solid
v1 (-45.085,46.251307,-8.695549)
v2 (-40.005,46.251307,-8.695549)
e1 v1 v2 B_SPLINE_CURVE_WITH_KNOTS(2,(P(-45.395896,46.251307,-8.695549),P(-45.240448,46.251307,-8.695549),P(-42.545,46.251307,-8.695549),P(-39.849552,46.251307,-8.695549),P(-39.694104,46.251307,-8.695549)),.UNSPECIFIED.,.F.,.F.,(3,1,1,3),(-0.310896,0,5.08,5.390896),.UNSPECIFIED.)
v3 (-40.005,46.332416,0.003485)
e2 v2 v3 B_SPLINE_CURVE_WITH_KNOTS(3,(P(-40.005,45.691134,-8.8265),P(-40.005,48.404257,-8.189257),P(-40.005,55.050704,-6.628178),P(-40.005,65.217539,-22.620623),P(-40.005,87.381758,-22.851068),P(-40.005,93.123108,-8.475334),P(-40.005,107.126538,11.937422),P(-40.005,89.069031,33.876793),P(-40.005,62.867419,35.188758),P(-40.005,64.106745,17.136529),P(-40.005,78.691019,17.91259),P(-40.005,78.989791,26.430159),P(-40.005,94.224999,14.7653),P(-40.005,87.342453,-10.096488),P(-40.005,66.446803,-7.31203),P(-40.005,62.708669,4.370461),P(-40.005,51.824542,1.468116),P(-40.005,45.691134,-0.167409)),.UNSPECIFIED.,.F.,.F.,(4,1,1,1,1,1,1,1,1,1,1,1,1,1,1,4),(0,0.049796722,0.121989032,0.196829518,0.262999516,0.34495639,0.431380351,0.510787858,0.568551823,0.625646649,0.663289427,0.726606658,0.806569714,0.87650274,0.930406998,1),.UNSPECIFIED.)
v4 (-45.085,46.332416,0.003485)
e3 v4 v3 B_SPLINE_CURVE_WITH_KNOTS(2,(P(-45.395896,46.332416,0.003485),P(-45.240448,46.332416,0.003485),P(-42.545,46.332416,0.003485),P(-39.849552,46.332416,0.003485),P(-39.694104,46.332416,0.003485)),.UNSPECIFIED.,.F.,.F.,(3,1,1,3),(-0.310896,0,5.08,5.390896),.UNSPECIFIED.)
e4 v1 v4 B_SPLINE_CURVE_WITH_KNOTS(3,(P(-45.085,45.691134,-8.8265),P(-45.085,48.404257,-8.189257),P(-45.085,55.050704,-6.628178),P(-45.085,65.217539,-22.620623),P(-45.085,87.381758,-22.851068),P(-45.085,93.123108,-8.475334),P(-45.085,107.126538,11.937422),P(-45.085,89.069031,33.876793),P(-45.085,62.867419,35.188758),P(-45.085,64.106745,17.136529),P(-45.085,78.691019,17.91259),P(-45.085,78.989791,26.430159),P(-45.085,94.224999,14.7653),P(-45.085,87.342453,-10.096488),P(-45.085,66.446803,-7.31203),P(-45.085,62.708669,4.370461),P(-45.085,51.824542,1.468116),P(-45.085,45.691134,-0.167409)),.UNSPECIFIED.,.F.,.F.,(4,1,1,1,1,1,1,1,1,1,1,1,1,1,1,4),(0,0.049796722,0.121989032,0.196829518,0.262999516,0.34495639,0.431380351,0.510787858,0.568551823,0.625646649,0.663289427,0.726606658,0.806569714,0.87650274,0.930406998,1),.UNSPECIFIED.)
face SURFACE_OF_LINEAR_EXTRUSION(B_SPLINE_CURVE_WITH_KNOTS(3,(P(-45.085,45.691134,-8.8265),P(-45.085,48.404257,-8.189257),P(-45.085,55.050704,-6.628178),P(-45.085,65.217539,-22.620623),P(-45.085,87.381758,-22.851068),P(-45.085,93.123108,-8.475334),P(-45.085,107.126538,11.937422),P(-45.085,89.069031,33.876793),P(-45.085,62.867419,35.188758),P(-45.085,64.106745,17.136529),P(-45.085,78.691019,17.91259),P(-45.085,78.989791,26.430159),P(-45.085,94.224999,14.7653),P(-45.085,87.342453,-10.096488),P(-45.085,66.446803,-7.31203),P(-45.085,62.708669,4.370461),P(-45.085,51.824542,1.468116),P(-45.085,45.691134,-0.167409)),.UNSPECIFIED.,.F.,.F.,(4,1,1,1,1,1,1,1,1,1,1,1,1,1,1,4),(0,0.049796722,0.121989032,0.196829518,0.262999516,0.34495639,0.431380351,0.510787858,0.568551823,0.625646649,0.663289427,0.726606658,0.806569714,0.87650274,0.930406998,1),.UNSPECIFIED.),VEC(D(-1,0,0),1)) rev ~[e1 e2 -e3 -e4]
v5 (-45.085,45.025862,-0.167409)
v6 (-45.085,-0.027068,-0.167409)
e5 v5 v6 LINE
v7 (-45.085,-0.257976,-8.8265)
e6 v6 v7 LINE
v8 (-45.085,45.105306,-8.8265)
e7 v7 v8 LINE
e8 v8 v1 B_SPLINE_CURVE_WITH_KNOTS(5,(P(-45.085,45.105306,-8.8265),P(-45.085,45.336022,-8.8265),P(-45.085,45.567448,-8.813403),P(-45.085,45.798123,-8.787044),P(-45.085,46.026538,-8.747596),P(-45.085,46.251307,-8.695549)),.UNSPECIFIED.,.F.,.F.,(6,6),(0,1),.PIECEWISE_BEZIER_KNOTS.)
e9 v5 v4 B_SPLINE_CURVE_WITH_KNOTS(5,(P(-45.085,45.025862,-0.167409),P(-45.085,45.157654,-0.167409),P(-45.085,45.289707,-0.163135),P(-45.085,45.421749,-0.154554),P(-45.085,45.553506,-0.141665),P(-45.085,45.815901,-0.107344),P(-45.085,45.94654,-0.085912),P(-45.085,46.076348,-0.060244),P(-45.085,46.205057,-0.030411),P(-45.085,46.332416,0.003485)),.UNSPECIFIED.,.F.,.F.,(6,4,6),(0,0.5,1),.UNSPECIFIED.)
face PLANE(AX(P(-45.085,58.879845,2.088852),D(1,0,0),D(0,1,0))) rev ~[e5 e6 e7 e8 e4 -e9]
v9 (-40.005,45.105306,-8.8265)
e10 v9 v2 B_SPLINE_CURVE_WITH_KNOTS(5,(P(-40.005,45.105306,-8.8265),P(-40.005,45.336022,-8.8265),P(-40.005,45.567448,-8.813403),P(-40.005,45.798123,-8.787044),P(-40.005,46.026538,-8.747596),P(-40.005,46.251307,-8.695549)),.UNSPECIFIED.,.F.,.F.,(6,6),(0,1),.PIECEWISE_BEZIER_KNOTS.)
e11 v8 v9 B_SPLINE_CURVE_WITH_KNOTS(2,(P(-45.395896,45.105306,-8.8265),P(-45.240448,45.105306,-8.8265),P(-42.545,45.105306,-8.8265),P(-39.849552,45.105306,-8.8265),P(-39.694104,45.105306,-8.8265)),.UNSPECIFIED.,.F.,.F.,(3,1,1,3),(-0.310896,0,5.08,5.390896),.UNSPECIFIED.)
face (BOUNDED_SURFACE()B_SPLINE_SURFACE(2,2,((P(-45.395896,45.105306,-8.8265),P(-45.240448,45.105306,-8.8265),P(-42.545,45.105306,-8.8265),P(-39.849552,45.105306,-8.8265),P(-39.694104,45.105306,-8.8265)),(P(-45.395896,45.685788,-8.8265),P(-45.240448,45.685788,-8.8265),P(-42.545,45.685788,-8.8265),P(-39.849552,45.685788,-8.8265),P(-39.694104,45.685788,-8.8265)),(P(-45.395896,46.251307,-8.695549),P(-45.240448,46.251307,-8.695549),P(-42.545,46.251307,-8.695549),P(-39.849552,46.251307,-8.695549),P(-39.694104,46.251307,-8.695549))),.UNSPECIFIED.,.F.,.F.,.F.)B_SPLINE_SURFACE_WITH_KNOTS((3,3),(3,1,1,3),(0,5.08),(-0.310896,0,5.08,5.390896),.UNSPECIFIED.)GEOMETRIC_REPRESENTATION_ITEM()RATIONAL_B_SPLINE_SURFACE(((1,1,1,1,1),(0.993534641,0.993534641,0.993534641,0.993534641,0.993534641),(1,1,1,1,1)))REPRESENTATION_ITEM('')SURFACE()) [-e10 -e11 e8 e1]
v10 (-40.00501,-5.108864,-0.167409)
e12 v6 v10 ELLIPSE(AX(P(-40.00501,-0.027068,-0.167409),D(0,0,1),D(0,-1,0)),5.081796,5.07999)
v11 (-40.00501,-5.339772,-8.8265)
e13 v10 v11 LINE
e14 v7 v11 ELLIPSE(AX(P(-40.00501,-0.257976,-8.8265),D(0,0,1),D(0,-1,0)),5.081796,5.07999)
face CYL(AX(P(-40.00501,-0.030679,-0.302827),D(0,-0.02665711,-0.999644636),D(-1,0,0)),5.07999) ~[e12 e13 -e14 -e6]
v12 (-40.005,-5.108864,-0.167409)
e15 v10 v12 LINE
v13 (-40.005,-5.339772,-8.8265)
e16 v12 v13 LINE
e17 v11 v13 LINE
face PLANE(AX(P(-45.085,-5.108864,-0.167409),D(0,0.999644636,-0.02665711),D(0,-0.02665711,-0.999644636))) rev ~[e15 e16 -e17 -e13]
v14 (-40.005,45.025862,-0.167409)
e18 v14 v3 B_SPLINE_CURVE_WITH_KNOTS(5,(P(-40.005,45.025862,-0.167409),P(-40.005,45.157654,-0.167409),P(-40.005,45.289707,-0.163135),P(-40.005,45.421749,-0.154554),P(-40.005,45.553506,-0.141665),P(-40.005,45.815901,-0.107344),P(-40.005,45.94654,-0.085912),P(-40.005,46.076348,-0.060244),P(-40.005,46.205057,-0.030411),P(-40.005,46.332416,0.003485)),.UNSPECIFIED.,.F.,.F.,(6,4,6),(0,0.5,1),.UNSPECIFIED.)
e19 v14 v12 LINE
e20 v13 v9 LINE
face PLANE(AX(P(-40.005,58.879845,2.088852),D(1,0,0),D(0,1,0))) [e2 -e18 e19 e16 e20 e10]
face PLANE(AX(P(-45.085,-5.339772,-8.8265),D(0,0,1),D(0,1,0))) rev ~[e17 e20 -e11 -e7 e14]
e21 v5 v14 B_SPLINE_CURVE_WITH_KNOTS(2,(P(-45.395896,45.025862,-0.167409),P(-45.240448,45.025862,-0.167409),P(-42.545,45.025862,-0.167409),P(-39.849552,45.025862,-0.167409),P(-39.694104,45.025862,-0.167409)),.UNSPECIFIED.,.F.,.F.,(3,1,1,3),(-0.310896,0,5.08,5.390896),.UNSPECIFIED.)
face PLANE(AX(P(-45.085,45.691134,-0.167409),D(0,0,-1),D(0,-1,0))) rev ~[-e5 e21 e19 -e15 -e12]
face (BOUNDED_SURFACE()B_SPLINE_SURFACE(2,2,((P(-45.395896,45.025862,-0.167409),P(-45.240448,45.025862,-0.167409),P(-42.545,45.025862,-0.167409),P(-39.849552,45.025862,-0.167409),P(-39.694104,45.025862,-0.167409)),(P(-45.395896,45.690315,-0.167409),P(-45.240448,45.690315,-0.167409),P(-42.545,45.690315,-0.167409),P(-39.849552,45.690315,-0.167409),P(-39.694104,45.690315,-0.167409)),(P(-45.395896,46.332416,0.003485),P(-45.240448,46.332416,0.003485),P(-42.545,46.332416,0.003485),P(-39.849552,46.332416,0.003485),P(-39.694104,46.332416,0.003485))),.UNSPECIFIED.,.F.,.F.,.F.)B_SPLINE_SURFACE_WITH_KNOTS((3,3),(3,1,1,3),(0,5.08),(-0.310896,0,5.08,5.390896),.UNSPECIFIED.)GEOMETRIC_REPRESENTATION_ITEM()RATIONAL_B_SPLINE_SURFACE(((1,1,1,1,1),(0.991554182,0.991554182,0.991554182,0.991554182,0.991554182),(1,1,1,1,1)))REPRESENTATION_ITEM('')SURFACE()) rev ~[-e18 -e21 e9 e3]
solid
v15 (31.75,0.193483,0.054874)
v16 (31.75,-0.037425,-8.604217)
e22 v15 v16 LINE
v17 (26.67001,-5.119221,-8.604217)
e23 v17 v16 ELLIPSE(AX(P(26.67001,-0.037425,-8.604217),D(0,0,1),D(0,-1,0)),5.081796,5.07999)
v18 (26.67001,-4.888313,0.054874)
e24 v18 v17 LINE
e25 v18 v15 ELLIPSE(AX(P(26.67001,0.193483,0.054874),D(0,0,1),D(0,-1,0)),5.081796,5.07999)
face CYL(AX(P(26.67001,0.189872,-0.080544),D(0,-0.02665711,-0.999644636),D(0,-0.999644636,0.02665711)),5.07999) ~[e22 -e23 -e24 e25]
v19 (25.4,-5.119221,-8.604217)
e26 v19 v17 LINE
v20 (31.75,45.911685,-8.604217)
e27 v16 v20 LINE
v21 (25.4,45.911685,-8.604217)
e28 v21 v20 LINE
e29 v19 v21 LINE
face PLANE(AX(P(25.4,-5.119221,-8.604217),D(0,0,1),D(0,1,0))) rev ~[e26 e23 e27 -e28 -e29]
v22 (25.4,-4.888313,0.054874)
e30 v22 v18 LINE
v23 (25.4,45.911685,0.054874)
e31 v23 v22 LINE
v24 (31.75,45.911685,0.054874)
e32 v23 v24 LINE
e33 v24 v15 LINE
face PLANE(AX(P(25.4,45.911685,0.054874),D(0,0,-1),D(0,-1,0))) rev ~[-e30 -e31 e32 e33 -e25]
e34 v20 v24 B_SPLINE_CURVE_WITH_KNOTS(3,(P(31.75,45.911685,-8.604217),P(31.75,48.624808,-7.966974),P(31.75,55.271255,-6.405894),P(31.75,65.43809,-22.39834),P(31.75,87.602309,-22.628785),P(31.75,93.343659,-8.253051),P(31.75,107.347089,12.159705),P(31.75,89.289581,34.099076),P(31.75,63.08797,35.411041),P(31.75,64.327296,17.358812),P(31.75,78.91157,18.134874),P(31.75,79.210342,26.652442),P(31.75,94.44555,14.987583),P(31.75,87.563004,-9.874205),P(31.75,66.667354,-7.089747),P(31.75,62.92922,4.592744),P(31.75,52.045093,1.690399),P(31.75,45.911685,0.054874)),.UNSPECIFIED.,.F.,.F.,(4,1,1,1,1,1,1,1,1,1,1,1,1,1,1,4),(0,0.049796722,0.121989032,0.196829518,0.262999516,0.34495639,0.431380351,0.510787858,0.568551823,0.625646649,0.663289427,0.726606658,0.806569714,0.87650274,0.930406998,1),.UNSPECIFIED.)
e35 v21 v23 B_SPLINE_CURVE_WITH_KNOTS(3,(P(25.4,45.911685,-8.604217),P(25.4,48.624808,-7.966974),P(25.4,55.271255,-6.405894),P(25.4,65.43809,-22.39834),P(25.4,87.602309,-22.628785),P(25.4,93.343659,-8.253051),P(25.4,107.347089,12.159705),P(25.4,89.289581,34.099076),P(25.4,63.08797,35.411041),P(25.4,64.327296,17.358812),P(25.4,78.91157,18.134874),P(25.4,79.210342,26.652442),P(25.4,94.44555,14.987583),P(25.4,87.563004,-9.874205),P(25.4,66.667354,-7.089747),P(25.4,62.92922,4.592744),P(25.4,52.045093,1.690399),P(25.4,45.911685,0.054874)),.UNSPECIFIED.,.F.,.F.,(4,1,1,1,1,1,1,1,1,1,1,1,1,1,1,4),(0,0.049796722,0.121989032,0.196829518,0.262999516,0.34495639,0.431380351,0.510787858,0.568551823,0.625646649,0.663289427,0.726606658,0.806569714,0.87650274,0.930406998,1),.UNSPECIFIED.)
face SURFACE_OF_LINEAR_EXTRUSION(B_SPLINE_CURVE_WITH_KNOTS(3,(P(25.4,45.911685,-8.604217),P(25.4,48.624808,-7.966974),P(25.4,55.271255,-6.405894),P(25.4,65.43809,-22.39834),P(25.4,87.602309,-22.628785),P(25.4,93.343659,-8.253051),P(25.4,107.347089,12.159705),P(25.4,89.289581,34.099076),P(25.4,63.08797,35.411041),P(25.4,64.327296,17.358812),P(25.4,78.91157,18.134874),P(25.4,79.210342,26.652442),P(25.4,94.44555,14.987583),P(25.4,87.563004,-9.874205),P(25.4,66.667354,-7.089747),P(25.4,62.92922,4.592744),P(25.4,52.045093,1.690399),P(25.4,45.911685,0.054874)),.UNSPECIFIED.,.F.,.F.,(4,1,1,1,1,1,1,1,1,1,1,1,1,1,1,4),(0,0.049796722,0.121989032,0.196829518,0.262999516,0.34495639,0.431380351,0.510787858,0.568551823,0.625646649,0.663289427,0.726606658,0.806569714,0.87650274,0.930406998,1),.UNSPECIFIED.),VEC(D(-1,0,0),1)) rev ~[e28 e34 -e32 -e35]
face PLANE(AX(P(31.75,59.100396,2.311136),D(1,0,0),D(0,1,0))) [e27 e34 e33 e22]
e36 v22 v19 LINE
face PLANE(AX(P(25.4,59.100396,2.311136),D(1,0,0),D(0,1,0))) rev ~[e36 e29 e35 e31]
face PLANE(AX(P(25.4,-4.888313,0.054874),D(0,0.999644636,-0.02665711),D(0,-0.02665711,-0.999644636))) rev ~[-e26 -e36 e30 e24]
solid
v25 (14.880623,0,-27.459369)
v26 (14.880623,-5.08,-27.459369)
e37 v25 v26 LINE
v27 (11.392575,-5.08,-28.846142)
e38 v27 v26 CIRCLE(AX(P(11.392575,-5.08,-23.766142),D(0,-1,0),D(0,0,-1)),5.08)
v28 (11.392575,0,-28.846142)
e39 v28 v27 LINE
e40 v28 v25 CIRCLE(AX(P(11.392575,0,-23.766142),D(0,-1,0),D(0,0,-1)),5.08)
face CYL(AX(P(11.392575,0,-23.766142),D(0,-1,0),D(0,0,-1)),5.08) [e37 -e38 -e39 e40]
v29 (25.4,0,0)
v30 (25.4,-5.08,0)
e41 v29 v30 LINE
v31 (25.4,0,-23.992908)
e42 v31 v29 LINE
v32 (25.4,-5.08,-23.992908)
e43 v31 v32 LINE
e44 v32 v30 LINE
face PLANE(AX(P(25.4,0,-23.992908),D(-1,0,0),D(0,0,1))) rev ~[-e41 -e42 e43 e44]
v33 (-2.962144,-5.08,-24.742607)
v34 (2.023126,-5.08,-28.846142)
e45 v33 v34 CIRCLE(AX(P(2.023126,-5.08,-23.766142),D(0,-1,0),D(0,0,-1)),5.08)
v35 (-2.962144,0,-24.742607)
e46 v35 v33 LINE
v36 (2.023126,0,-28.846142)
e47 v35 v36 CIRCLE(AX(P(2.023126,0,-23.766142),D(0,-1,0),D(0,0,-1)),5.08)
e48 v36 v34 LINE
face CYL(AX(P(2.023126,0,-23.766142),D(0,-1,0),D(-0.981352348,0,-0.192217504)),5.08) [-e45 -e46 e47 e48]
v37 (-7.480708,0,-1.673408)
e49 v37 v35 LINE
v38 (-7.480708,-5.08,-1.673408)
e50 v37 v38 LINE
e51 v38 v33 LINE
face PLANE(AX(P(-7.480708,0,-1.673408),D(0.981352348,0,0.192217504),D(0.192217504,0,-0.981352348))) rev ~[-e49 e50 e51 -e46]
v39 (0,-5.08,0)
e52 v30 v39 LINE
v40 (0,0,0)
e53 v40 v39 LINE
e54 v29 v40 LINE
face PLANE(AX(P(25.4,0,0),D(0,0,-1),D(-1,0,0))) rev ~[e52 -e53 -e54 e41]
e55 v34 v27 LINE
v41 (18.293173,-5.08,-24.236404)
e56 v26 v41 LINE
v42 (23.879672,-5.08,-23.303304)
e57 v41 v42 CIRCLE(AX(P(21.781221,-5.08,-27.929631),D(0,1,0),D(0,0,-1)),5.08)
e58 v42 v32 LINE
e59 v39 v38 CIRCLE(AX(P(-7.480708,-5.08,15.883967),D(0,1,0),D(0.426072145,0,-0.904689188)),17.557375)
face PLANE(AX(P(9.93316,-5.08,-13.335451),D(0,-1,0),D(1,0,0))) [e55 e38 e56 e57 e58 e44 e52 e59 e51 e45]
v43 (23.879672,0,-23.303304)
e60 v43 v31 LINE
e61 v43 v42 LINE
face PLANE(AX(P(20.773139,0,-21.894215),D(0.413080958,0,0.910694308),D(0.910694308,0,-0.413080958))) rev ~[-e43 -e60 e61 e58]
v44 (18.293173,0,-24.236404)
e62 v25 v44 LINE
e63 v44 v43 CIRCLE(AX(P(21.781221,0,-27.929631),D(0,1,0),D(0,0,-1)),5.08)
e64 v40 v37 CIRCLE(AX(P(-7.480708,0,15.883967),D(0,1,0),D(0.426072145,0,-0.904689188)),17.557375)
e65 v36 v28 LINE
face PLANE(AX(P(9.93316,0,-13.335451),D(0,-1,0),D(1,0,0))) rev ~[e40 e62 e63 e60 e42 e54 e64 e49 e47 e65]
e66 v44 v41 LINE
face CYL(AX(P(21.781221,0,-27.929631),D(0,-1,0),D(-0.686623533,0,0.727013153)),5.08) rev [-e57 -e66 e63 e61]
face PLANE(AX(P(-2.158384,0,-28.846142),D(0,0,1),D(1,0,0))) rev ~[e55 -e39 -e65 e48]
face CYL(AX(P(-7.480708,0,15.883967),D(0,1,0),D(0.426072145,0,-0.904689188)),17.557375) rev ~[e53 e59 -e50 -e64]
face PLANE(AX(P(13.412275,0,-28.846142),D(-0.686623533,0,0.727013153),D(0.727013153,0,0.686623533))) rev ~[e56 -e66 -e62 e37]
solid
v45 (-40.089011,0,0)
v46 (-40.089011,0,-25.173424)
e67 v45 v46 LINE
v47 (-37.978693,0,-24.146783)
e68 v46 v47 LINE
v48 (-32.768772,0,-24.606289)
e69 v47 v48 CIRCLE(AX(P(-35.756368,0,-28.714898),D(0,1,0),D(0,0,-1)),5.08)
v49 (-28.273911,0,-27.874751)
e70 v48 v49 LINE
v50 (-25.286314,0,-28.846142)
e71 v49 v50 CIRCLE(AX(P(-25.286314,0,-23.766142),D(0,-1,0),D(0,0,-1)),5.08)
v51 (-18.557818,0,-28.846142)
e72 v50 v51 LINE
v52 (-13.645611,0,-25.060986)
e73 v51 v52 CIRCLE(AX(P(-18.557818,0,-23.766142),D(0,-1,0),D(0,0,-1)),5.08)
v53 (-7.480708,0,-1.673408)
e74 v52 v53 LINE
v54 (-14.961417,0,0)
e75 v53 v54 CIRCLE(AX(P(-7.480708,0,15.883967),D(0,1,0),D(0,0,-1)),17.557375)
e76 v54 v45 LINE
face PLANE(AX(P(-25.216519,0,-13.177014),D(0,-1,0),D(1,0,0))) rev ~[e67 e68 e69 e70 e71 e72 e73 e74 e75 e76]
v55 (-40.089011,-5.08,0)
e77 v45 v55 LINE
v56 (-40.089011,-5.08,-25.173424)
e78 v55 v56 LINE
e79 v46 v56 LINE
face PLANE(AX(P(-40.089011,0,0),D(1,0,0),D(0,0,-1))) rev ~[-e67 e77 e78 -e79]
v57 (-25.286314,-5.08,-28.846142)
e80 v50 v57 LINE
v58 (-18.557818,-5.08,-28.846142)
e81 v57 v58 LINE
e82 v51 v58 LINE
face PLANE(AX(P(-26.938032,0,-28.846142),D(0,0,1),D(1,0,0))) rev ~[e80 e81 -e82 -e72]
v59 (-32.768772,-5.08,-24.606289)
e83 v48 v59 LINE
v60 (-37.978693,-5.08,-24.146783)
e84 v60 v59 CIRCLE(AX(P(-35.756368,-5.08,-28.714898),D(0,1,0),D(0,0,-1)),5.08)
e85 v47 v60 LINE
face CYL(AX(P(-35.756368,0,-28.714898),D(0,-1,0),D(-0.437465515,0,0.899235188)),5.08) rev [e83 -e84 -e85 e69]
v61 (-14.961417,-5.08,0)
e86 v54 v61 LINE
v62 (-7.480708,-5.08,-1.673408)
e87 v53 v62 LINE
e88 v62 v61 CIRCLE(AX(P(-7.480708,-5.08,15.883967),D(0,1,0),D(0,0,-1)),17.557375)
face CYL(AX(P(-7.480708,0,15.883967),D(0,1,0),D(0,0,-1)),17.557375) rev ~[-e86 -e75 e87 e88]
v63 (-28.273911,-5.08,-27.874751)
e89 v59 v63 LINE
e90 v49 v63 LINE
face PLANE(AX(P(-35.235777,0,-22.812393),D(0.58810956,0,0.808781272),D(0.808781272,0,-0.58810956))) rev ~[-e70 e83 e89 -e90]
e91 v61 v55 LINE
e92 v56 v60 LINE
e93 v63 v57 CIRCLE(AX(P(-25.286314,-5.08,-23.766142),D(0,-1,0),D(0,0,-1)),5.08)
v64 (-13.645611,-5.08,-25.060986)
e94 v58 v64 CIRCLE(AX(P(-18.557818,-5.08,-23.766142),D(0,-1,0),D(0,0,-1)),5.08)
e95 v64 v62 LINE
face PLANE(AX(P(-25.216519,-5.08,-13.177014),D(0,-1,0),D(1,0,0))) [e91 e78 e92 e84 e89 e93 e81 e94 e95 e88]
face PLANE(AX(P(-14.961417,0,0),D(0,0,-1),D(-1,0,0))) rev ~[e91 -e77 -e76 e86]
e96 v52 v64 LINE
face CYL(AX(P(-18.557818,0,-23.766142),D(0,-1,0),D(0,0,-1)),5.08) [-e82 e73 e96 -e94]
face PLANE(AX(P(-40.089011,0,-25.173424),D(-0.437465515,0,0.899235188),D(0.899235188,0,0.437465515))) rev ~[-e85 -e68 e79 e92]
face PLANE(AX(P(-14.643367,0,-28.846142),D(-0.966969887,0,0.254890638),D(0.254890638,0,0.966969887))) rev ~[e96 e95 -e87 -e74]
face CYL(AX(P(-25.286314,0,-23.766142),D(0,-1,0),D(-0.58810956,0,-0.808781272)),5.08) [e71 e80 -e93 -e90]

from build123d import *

# Parameters (mm, degrees)
F1_DEPTH  = 5.08
F2_R      = 5.08
F5_DEPTH  = 5.08
F6_R      = 5.08
F7_DEPTH  = 5.08
F8_R      = 5.08
F10_DEPTH = 6.35
F13_R     = 5.07999
F13_2_R   = 5.07999


# Not quite as in the source:
# - a fillet or chamfer is up to 0.001 mm smaller than in the source, because OpenCascade refuses the exact size


with BuildPart() as f1:
    # F0 (on Right) → F1 (new body)
    with BuildSketch(Plane.YZ):
        with BuildLine():
            Line((18.7036339194, 8.6590908468), (-32.0963636041, 8.6590908468))
            Line((-32.0963636041, 8.6590908468), (-32.3272719979, 0))
            Line((-32.3272719979, 0), (18.7036339194, 0))
            add(Edge.make_bspline(
                [(18.7036339194, 0), (21.4167571987, 0.6372428688), (28.063204378, 2.1983223451), (38.2300388432, -13.794123064), (60.394257954, -14.0245683867), (66.1356081474, 0.3511655731), (80.1390378808, 20.7639219103), (62.081530643, 42.703292602), (35.8799194646, 44.0152577696), (37.1192454184, 25.9630287506), (51.7035192179, 26.7390904218), (52.0022911902, 35.2566591152), (67.237499067, 23.591799501), (60.3549528626, -1.2699881146), (39.459302681, 1.5144697653), (35.721169059, 13.1969605328), (24.8370419283, 10.2946159712), (18.7036339194, 8.6590908468)],
                knots=[0, 0, 0, 0, 0.0497967219, 0.1219890317, 0.1968295181, 0.2629995162, 0.3449563898, 0.4313803509, 0.5107878584, 0.5685518225, 0.6256466487, 0.6632894265, 0.7266066585, 0.8065697144, 0.8765027399, 0.9304069977, 1, 1, 1, 1], degree=3))
        make_face()
    extrude(amount=F1_DEPTH)

    # F2
    f2_edges = [f1.edges().sort_by_distance(p)[0] for p in [
        (2.54, 18.703634, 8.659091),
        (2.54, 18.703634, 0),
    ]]
    fillet(f2_edges, radius=F2_R)


with BuildPart() as f1_1:
    # F3: moved
    add(f1.part.moved(Location((-67.945, 0, 0))))


with BuildPart() as f5:
    # F4 (on Front) → F5 (new body)
    with BuildSketch(Plane.XZ):
        with BuildLine():
            Line((-14.9614168331, 0), (-40.0890111923, 0))
            Line((-40.0890111923, 0), (-40.0890111923, -25.1734238118))
            Line((-40.0890111923, -25.1734238118), (-35.2357774973, -22.8123925626))
            Line((-35.2357774973, -22.8123925626), (-26.938032, -28.8461418822))
            Line((-26.938032, -28.8461418822), (-14.6433674064, -28.8461418822))
            Line((-14.6433674064, -28.8461418822), (-7.4807084166, -1.673407664))
            ThreePointArc((-7.4807084166, -1.673407664), (-11.3135041202, -1.2499491441), (-14.9614168331, 0))
        make_face()
    extrude(amount=F5_DEPTH)

    # F6
    f6_edges = [f5.edges().sort_by_distance(p)[0] for p in [
        (-26.938032, -2.54, -28.846142),
        (-35.235777, -2.54, -22.812393),
        (-14.643367, -2.54, -28.846142),
    ]]
    fillet(f6_edges, radius=F6_R)


with BuildPart() as f7:
    # F4 (on Front) → F7 (new body)
    with BuildSketch(Plane.XZ):
        with BuildLine():
            ThreePointArc((0, 0), (-3.6479127129, -1.2499491441), (-7.4807084166, -1.673407664))
            Line((-7.4807084166, -1.673407664), (-2.1583844248, -28.8461418822))
            Line((-2.1583844248, -28.8461418822), (13.412274749, -28.8461418822))
            Line((13.412274749, -28.8461418822), (20.7731388509, -21.8942146748))
            Line((20.7731388509, -21.8942146748), (25.4, -23.9929081872))
            Line((25.4, -23.9929081872), (25.4, 0))
            Line((25.4, 0), (0, 0))
        make_face()
    extrude(amount=F7_DEPTH)

    # F8
    f8_edges = [f7.edges().sort_by_distance(p)[0] for p in [
        (20.773139, -2.54, -21.894215),
        (13.412275, -2.54, -28.846142),
        (-2.158384, -2.54, -28.846142),
    ]]
    fillet(f8_edges, radius=F8_R)


with BuildPart() as f10:
    # F9 (on Right) → F10 (new body)
    with BuildSketch(Plane.YZ):
        with BuildLine():
            Line((122.7466847543, 5.5158741027), (71.9466872309, 5.5158741027))
            Line((71.9466872309, 5.5158741027), (71.715778837, -3.1432167441))
            Line((71.715778837, -3.1432167441), (122.7466847543, -3.1432167441))
            add(Edge.make_bspline(
                [(122.7466847543, -3.1432167441), (125.4598080337, -2.5059738753), (132.1062552129, -0.944894399), (142.2730896781, -16.9373398081), (164.437308789, -17.1677851308), (170.1786589823, -2.792051171), (184.1820887158, 17.6207051662), (166.124581478, 39.5600758579), (139.9229702995, 40.8720410255), (141.1622962533, 22.8198120065), (155.7465700529, 23.5958736777), (156.0453420252, 32.1134423711), (171.2805499019, 20.4485827569), (164.3980036975, -4.4132048587), (143.502353516, -1.6287469788), (139.7642198939, 10.0537437887), (128.8800927632, 7.1513992271), (122.7466847543, 5.5158741027)],
                knots=[0, 0, 0, 0, 0.0497967219, 0.1219890317, 0.1968295181, 0.2629995162, 0.3449563898, 0.4313803509, 0.5107878584, 0.5685518225, 0.6256466487, 0.6632894265, 0.7266066585, 0.8065697144, 0.8765027399, 0.9304069977, 1, 1, 1, 1], degree=3))
        make_face()
    extrude(amount=F10_DEPTH)


with BuildPart() as f10_1:
    # F11: moved
    add(f10.part.moved(Location((25.4, -76.835, -5.461))))

    # F13#2 (radius 5.08 in the source; OpenCascade refuses exactly that, so slightly less here)
    f13_2_edges = [f10_1.edges().sort_by_distance(p)[0] for p in [
        (31.75, -5.003767, -4.274671),
    ]]
    fillet(f13_2_edges, radius=F13_2_R)


with BuildPart() as f1_2:
    # F12: moved
    add(f1_1.part.moved(Location((22.86, 26.9875, -8.8265))))

    # F13 (radius 5.08 in the source; OpenCascade refuses exactly that, so slightly less here)
    f13_edges = [f1_2.edges().sort_by_distance(p)[0] for p in [
        (-45.085, -5.224318, -4.496955),
    ]]
    fillet(f13_edges, radius=F13_R)


solid = Compound([f5.part, f7.part, f10_1.part, f1_2.part])
